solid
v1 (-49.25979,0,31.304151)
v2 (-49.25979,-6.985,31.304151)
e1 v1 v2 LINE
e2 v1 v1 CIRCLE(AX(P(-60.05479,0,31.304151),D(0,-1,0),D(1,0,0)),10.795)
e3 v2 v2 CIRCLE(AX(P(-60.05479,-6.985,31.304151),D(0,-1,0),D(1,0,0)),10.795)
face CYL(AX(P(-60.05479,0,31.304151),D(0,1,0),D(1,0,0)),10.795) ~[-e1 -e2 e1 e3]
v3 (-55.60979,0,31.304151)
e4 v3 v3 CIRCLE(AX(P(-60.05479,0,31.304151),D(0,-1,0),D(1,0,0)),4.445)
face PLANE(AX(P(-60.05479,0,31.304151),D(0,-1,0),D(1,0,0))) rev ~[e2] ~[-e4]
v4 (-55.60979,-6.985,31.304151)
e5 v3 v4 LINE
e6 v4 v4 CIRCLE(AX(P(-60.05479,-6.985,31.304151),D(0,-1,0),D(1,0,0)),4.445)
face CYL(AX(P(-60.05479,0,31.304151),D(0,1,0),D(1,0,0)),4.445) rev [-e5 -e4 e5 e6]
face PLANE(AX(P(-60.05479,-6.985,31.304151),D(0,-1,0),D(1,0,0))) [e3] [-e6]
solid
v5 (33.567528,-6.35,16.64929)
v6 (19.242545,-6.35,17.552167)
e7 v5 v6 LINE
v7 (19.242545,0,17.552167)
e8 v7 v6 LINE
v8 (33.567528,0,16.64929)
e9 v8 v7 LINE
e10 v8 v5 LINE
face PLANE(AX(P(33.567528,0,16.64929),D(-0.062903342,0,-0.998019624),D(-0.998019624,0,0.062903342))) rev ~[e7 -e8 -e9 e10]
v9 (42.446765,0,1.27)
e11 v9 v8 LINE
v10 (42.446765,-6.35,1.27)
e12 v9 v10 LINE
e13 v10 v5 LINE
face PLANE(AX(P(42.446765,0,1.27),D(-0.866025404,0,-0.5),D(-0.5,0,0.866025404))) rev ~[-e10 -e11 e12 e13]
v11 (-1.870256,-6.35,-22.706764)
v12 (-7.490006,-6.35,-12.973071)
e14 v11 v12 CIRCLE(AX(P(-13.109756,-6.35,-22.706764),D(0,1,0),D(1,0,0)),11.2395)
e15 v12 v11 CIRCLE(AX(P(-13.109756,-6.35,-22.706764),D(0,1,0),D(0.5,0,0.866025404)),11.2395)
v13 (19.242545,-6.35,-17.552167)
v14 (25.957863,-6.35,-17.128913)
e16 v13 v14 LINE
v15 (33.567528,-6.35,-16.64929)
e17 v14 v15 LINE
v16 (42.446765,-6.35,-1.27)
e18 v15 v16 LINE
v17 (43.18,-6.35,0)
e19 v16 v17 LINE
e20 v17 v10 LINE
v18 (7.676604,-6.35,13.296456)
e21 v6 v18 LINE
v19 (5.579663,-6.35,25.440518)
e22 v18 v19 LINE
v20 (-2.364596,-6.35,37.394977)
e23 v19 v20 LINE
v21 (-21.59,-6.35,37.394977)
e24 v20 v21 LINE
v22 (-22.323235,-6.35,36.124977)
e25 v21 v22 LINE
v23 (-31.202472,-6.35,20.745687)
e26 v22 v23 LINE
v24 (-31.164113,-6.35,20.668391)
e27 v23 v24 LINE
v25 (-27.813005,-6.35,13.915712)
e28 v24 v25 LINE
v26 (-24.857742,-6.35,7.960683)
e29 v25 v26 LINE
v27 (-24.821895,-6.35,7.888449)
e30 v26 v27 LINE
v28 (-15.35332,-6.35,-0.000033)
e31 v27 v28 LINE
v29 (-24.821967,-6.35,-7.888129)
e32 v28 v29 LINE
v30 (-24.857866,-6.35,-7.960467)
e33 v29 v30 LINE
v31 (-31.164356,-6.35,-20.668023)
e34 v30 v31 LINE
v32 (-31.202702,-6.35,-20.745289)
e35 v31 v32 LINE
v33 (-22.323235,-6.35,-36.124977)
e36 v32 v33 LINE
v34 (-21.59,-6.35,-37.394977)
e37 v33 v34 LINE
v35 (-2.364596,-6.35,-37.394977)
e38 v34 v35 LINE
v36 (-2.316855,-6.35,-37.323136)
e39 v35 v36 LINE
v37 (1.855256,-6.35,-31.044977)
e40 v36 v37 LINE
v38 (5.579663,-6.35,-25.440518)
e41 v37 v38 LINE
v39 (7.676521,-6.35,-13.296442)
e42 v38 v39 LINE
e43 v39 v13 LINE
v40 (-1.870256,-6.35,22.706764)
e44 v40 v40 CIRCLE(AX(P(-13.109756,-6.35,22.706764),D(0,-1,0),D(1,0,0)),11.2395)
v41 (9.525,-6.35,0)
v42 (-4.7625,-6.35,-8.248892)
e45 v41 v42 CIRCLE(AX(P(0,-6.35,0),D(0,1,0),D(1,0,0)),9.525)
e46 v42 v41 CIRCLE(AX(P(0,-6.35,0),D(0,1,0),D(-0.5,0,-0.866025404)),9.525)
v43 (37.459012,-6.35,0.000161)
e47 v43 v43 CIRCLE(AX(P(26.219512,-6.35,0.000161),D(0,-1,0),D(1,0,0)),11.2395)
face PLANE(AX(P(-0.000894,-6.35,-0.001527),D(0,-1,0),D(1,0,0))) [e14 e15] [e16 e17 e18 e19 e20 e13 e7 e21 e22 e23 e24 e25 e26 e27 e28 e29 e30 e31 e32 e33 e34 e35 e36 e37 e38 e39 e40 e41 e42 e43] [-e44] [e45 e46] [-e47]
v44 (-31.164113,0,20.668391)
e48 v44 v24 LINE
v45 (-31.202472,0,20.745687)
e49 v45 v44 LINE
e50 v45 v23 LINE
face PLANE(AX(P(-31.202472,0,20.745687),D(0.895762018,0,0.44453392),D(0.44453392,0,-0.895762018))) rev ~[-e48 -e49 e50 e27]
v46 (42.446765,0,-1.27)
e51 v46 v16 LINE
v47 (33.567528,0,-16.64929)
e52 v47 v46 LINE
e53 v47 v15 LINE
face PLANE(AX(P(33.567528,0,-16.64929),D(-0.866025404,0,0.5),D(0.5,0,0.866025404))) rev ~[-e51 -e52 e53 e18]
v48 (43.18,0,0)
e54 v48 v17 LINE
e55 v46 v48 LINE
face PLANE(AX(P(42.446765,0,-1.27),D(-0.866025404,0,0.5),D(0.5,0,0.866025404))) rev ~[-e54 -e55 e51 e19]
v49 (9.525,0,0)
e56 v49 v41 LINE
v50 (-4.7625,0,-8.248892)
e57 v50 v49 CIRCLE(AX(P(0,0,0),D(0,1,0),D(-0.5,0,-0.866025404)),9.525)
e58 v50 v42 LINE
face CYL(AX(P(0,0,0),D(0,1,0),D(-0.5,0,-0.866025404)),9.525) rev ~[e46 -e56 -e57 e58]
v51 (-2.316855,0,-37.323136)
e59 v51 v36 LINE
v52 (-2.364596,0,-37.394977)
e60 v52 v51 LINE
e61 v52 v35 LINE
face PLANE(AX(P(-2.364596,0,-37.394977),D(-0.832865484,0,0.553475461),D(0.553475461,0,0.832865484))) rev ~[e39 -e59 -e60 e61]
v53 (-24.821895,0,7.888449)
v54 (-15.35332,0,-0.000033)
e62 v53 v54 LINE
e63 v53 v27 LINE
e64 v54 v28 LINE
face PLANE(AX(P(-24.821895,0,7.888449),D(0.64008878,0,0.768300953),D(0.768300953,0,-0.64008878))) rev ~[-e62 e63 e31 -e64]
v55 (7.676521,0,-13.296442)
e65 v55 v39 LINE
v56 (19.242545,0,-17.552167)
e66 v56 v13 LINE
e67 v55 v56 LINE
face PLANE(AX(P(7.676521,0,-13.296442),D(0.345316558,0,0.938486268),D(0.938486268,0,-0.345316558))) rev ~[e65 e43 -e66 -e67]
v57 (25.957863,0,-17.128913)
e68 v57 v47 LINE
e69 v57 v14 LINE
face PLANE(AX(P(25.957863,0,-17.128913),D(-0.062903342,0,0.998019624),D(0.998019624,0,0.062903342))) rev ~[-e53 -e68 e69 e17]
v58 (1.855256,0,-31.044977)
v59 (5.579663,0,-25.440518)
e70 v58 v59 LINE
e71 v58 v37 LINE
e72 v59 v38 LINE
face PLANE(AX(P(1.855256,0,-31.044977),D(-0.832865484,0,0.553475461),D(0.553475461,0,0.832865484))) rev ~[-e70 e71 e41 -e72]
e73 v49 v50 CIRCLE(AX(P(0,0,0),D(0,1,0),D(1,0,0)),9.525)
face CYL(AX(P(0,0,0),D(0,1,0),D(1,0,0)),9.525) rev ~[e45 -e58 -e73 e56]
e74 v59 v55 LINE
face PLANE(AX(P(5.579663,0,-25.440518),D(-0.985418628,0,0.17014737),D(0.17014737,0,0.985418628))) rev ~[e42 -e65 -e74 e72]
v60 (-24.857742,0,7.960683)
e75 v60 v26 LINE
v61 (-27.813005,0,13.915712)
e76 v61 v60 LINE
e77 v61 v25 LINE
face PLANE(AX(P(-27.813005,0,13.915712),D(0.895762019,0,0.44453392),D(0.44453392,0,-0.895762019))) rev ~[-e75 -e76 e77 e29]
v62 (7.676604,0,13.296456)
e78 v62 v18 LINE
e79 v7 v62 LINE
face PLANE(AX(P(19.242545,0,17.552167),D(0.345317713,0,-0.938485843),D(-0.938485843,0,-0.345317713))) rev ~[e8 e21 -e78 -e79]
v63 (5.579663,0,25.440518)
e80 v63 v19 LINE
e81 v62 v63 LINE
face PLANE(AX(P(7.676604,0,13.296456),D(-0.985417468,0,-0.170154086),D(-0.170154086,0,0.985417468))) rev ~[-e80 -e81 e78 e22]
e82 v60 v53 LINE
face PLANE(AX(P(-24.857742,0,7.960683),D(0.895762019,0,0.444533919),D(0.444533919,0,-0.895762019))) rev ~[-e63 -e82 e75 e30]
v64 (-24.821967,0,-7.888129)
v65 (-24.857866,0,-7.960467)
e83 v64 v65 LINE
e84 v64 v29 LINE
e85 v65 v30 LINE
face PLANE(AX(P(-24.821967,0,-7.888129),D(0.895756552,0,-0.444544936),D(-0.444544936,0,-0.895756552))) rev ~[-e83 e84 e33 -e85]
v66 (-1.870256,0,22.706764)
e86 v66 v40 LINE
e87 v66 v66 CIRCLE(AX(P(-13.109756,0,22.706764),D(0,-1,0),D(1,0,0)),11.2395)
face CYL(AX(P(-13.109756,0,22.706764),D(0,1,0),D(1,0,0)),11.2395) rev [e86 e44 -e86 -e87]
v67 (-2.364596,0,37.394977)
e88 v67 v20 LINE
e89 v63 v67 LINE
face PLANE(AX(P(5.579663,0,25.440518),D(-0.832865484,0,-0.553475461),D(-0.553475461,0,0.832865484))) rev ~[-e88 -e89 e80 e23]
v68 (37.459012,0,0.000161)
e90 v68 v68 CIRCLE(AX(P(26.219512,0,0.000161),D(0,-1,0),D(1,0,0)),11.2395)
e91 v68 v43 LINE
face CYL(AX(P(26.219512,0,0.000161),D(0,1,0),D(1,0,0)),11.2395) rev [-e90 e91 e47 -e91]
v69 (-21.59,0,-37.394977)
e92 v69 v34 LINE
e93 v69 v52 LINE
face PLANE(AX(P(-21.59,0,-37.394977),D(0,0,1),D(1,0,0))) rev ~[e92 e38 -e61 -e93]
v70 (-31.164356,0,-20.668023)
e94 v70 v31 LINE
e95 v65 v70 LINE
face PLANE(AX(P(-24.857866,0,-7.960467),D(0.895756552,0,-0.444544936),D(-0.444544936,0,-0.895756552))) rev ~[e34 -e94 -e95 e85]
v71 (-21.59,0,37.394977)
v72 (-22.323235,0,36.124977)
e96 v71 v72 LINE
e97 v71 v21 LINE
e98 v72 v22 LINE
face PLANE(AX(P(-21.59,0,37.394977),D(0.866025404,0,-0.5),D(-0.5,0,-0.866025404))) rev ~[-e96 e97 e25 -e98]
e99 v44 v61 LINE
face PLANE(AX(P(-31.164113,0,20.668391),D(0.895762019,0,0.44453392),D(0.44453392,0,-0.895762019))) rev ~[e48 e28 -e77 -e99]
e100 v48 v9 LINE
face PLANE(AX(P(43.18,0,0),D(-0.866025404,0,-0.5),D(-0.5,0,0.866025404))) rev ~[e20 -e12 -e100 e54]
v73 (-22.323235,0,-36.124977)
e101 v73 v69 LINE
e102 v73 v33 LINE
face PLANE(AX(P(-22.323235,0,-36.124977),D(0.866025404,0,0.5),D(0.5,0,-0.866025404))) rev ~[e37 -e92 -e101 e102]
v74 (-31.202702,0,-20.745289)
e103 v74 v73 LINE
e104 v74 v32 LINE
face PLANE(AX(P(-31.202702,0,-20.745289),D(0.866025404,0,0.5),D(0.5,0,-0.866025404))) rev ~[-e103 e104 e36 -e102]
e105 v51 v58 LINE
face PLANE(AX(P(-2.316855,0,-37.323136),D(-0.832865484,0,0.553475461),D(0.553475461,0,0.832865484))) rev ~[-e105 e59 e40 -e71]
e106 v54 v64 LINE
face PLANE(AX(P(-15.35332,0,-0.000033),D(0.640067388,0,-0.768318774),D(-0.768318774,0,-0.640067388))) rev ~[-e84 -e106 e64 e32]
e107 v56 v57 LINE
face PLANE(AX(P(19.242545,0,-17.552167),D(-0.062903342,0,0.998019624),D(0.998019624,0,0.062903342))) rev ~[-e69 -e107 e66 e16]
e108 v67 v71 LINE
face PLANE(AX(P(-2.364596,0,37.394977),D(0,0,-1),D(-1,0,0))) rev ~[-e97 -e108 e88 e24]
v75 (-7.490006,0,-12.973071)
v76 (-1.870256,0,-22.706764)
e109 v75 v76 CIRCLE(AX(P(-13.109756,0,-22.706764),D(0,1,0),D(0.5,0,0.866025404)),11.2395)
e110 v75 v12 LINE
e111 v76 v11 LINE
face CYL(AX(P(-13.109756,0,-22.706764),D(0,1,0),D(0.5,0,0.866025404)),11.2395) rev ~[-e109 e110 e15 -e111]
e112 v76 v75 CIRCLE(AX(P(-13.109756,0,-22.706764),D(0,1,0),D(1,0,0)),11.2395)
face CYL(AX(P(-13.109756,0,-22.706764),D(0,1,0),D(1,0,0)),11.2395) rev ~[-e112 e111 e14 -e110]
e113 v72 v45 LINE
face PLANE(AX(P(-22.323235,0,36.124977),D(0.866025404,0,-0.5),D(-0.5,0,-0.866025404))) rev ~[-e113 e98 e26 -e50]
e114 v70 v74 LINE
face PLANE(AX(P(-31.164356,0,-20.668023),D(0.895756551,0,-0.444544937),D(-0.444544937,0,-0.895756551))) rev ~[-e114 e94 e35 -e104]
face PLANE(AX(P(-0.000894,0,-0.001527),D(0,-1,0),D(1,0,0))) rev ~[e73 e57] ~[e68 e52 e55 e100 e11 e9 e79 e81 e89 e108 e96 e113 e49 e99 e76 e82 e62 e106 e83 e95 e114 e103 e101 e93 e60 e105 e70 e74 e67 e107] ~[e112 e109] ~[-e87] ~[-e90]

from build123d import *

# Parameters (mm, degrees)
F0_R     = 11.2395
F1_DEPTH = 6.35
F2_R     = 10.795
F2_R_2   = 4.445
F3_DEPTH = 6.985


# Not quite as in the source:
# - ends of sketch curves that miss each other by under 0.0002 mm in the source are joined


with BuildPart() as f1:
    # F0 (on Front) → F1 (new body)
    with BuildSketch(Plane.XZ):
        with BuildLine():
            Line((42.4467651581, 1.27), (33.5675281941, 16.6492895541))
            Line((33.5675281941, 16.6492895541), (19.2425445444, 17.5521669359))
            Line((19.2425445444, 17.5521669359), (7.6766035347, 13.2964561731))
            Line((7.6766035347, 13.2964561731), (5.579663063, 25.4405181745))
            Line((5.579663063, 25.4405181745), (-2.3645964913, 37.3949769354))
            Line((-2.3645964913, 37.3949769354), (-20.1235303163, 37.3949769354))
            ThreePointArc((-20.1235303163, 37.3949769354), (-21.3935303163, 37.054681461), (-22.3232348419, 36.1249769354))
            Line((-22.3232348419, 36.1249769354), (-31.2024718059, 20.7456873813))
            Line((-31.2024718059, 20.7456873813), (-31.1641125036, 20.668391129))
            Line((-31.1641125036, 20.668391129), (-27.8130050023, 13.9157122299))
            Line((-27.8130050023, 13.9157122299), (-24.8577417731, 7.960682843))
            Line((-24.8577417731, 7.960682843), (-24.8218947301, 7.8884489409))
            Line((-24.8218947301, 7.8884489409), (-15.353319828, -3.34766e-05))
            Line((-15.353319828, -3.34766e-05), (-24.8219665561, -7.8881291301))
            Line((-24.8219665561, -7.8881291301), (-24.8578663434, -7.9604670809))
            Line((-24.8578663434, -7.9604670809), (-31.1643564099, -20.6680233587))
            Line((-31.1643564099, -20.6680233587), (-31.2027017544, -20.7452890988))
            Line((-31.2027017544, -20.7452890988), (-22.3232348418, -36.1249769356))
            ThreePointArc((-22.3232348418, -36.1249769356), (-21.9195815404, -36.6510281597), (-21.3935303163, -37.0546814611))
            ThreePointArc((-21.3935303163, -37.0546814611), (-20.7809306909, -37.3084285342), (-20.1235303165, -37.3949769354))
            Line((-20.1235303165, -37.3949769354), (-2.3645964913, -37.3949769354))
            Line((-2.3645964913, -37.3949769354), (-2.3168550697, -37.3231360229))
            Line((-2.3168550697, -37.3231360229), (1.8552556307, -31.0449769354))
            Line((1.8552556307, -31.0449769354), (5.579663063, -25.4405181745))
            Line((5.579663063, -25.4405181745), (7.6765207659, -13.2964418818))
            Line((7.6765207659, -13.2964418818), (19.2425445444, -17.5521669359))
            Line((19.2425445444, -17.5521669359), (25.957862804, -17.1289127727))
            Line((25.957862804, -17.1289127727), (33.5675281941, -16.6492895541))
            Line((33.5675281941, -16.6492895541), (42.4467651581, -1.27))
            ThreePointArc((42.4467651581, -1.27), (42.7870606325, 0), (42.4467651581, 1.27))
        make_face()
        with BuildLine():
            ThreePointArc((-1.8702560234, -22.7067635073), (-22.8434485492, -28.3265135073), (-7.4900060234, -12.9730709815))
            ThreePointArc((-7.4900060234, -12.9730709815), (-3.3760634975, -17.0870135073), (-1.8702560234, -22.7067635073))
        make_face(mode=Mode.SUBTRACT)
        with BuildLine():
            ThreePointArc((-4.7625, -8.248891971), (-4.7625, 8.248891971), (9.525, 0))
            ThreePointArc((9.525, 0), (4.7625, -8.248891971), (-4.7625, -8.248891971))
        make_face(mode=Mode.SUBTRACT)
        with Locations((-13.1097560234, 22.7067635073)):
            Circle(F0_R, mode=Mode.SUBTRACT)
        with Locations((26.2195120463, 0.0001612286)):
            Circle(F0_R, mode=Mode.SUBTRACT)
        with BuildLine():
            Line((43.18, 0), (42.4467651581, 1.27))
            ThreePointArc((42.4467651581, 1.27), (42.7870606325, 0), (42.4467651581, -1.27))
            Line((42.4467651581, -1.27), (43.18, 0))
        make_face()
        with BuildLine():
            ThreePointArc((-22.3232348419, 36.1249769354), (-21.3935303163, 37.054681461), (-20.1235303163, 37.3949769354))
            Line((-20.1235303163, 37.3949769354), (-21.59, 37.3949769354))
            Line((-21.59, 37.3949769354), (-22.3232348419, 36.1249769354))
        make_face()
        with BuildLine():
            Line((-21.59, -37.3949769354), (-20.1235303165, -37.3949769354))
            ThreePointArc((-20.1235303165, -37.3949769354), (-20.7809306909, -37.3084285342), (-21.3935303163, -37.0546814611))
            Line((-21.3935303163, -37.0546814611), (-21.59, -37.3949769354))
        make_face()
        with BuildLine():
            Line((-21.59, -37.3949769354), (-21.3935303163, -37.0546814611))
            ThreePointArc((-21.3935303163, -37.0546814611), (-21.9195815404, -36.6510281597), (-22.3232348418, -36.1249769356))
            Line((-22.3232348418, -36.1249769356), (-21.59, -37.3949769354))
        make_face()
    extrude(amount=F1_DEPTH)


with BuildPart() as f3:
    # F2 (on Front) → F3 (new body)
    with BuildSketch(Plane.XZ):
        with Locations((-60.0547902286, 31.3041508198)):
            Circle(F2_R)
        with Locations((-60.0547902286, 31.3041508198)):
            Circle(F2_R_2, mode=Mode.SUBTRACT)
    extrude(amount=F3_DEPTH)


solid = Compound([f1.part, f3.part])
